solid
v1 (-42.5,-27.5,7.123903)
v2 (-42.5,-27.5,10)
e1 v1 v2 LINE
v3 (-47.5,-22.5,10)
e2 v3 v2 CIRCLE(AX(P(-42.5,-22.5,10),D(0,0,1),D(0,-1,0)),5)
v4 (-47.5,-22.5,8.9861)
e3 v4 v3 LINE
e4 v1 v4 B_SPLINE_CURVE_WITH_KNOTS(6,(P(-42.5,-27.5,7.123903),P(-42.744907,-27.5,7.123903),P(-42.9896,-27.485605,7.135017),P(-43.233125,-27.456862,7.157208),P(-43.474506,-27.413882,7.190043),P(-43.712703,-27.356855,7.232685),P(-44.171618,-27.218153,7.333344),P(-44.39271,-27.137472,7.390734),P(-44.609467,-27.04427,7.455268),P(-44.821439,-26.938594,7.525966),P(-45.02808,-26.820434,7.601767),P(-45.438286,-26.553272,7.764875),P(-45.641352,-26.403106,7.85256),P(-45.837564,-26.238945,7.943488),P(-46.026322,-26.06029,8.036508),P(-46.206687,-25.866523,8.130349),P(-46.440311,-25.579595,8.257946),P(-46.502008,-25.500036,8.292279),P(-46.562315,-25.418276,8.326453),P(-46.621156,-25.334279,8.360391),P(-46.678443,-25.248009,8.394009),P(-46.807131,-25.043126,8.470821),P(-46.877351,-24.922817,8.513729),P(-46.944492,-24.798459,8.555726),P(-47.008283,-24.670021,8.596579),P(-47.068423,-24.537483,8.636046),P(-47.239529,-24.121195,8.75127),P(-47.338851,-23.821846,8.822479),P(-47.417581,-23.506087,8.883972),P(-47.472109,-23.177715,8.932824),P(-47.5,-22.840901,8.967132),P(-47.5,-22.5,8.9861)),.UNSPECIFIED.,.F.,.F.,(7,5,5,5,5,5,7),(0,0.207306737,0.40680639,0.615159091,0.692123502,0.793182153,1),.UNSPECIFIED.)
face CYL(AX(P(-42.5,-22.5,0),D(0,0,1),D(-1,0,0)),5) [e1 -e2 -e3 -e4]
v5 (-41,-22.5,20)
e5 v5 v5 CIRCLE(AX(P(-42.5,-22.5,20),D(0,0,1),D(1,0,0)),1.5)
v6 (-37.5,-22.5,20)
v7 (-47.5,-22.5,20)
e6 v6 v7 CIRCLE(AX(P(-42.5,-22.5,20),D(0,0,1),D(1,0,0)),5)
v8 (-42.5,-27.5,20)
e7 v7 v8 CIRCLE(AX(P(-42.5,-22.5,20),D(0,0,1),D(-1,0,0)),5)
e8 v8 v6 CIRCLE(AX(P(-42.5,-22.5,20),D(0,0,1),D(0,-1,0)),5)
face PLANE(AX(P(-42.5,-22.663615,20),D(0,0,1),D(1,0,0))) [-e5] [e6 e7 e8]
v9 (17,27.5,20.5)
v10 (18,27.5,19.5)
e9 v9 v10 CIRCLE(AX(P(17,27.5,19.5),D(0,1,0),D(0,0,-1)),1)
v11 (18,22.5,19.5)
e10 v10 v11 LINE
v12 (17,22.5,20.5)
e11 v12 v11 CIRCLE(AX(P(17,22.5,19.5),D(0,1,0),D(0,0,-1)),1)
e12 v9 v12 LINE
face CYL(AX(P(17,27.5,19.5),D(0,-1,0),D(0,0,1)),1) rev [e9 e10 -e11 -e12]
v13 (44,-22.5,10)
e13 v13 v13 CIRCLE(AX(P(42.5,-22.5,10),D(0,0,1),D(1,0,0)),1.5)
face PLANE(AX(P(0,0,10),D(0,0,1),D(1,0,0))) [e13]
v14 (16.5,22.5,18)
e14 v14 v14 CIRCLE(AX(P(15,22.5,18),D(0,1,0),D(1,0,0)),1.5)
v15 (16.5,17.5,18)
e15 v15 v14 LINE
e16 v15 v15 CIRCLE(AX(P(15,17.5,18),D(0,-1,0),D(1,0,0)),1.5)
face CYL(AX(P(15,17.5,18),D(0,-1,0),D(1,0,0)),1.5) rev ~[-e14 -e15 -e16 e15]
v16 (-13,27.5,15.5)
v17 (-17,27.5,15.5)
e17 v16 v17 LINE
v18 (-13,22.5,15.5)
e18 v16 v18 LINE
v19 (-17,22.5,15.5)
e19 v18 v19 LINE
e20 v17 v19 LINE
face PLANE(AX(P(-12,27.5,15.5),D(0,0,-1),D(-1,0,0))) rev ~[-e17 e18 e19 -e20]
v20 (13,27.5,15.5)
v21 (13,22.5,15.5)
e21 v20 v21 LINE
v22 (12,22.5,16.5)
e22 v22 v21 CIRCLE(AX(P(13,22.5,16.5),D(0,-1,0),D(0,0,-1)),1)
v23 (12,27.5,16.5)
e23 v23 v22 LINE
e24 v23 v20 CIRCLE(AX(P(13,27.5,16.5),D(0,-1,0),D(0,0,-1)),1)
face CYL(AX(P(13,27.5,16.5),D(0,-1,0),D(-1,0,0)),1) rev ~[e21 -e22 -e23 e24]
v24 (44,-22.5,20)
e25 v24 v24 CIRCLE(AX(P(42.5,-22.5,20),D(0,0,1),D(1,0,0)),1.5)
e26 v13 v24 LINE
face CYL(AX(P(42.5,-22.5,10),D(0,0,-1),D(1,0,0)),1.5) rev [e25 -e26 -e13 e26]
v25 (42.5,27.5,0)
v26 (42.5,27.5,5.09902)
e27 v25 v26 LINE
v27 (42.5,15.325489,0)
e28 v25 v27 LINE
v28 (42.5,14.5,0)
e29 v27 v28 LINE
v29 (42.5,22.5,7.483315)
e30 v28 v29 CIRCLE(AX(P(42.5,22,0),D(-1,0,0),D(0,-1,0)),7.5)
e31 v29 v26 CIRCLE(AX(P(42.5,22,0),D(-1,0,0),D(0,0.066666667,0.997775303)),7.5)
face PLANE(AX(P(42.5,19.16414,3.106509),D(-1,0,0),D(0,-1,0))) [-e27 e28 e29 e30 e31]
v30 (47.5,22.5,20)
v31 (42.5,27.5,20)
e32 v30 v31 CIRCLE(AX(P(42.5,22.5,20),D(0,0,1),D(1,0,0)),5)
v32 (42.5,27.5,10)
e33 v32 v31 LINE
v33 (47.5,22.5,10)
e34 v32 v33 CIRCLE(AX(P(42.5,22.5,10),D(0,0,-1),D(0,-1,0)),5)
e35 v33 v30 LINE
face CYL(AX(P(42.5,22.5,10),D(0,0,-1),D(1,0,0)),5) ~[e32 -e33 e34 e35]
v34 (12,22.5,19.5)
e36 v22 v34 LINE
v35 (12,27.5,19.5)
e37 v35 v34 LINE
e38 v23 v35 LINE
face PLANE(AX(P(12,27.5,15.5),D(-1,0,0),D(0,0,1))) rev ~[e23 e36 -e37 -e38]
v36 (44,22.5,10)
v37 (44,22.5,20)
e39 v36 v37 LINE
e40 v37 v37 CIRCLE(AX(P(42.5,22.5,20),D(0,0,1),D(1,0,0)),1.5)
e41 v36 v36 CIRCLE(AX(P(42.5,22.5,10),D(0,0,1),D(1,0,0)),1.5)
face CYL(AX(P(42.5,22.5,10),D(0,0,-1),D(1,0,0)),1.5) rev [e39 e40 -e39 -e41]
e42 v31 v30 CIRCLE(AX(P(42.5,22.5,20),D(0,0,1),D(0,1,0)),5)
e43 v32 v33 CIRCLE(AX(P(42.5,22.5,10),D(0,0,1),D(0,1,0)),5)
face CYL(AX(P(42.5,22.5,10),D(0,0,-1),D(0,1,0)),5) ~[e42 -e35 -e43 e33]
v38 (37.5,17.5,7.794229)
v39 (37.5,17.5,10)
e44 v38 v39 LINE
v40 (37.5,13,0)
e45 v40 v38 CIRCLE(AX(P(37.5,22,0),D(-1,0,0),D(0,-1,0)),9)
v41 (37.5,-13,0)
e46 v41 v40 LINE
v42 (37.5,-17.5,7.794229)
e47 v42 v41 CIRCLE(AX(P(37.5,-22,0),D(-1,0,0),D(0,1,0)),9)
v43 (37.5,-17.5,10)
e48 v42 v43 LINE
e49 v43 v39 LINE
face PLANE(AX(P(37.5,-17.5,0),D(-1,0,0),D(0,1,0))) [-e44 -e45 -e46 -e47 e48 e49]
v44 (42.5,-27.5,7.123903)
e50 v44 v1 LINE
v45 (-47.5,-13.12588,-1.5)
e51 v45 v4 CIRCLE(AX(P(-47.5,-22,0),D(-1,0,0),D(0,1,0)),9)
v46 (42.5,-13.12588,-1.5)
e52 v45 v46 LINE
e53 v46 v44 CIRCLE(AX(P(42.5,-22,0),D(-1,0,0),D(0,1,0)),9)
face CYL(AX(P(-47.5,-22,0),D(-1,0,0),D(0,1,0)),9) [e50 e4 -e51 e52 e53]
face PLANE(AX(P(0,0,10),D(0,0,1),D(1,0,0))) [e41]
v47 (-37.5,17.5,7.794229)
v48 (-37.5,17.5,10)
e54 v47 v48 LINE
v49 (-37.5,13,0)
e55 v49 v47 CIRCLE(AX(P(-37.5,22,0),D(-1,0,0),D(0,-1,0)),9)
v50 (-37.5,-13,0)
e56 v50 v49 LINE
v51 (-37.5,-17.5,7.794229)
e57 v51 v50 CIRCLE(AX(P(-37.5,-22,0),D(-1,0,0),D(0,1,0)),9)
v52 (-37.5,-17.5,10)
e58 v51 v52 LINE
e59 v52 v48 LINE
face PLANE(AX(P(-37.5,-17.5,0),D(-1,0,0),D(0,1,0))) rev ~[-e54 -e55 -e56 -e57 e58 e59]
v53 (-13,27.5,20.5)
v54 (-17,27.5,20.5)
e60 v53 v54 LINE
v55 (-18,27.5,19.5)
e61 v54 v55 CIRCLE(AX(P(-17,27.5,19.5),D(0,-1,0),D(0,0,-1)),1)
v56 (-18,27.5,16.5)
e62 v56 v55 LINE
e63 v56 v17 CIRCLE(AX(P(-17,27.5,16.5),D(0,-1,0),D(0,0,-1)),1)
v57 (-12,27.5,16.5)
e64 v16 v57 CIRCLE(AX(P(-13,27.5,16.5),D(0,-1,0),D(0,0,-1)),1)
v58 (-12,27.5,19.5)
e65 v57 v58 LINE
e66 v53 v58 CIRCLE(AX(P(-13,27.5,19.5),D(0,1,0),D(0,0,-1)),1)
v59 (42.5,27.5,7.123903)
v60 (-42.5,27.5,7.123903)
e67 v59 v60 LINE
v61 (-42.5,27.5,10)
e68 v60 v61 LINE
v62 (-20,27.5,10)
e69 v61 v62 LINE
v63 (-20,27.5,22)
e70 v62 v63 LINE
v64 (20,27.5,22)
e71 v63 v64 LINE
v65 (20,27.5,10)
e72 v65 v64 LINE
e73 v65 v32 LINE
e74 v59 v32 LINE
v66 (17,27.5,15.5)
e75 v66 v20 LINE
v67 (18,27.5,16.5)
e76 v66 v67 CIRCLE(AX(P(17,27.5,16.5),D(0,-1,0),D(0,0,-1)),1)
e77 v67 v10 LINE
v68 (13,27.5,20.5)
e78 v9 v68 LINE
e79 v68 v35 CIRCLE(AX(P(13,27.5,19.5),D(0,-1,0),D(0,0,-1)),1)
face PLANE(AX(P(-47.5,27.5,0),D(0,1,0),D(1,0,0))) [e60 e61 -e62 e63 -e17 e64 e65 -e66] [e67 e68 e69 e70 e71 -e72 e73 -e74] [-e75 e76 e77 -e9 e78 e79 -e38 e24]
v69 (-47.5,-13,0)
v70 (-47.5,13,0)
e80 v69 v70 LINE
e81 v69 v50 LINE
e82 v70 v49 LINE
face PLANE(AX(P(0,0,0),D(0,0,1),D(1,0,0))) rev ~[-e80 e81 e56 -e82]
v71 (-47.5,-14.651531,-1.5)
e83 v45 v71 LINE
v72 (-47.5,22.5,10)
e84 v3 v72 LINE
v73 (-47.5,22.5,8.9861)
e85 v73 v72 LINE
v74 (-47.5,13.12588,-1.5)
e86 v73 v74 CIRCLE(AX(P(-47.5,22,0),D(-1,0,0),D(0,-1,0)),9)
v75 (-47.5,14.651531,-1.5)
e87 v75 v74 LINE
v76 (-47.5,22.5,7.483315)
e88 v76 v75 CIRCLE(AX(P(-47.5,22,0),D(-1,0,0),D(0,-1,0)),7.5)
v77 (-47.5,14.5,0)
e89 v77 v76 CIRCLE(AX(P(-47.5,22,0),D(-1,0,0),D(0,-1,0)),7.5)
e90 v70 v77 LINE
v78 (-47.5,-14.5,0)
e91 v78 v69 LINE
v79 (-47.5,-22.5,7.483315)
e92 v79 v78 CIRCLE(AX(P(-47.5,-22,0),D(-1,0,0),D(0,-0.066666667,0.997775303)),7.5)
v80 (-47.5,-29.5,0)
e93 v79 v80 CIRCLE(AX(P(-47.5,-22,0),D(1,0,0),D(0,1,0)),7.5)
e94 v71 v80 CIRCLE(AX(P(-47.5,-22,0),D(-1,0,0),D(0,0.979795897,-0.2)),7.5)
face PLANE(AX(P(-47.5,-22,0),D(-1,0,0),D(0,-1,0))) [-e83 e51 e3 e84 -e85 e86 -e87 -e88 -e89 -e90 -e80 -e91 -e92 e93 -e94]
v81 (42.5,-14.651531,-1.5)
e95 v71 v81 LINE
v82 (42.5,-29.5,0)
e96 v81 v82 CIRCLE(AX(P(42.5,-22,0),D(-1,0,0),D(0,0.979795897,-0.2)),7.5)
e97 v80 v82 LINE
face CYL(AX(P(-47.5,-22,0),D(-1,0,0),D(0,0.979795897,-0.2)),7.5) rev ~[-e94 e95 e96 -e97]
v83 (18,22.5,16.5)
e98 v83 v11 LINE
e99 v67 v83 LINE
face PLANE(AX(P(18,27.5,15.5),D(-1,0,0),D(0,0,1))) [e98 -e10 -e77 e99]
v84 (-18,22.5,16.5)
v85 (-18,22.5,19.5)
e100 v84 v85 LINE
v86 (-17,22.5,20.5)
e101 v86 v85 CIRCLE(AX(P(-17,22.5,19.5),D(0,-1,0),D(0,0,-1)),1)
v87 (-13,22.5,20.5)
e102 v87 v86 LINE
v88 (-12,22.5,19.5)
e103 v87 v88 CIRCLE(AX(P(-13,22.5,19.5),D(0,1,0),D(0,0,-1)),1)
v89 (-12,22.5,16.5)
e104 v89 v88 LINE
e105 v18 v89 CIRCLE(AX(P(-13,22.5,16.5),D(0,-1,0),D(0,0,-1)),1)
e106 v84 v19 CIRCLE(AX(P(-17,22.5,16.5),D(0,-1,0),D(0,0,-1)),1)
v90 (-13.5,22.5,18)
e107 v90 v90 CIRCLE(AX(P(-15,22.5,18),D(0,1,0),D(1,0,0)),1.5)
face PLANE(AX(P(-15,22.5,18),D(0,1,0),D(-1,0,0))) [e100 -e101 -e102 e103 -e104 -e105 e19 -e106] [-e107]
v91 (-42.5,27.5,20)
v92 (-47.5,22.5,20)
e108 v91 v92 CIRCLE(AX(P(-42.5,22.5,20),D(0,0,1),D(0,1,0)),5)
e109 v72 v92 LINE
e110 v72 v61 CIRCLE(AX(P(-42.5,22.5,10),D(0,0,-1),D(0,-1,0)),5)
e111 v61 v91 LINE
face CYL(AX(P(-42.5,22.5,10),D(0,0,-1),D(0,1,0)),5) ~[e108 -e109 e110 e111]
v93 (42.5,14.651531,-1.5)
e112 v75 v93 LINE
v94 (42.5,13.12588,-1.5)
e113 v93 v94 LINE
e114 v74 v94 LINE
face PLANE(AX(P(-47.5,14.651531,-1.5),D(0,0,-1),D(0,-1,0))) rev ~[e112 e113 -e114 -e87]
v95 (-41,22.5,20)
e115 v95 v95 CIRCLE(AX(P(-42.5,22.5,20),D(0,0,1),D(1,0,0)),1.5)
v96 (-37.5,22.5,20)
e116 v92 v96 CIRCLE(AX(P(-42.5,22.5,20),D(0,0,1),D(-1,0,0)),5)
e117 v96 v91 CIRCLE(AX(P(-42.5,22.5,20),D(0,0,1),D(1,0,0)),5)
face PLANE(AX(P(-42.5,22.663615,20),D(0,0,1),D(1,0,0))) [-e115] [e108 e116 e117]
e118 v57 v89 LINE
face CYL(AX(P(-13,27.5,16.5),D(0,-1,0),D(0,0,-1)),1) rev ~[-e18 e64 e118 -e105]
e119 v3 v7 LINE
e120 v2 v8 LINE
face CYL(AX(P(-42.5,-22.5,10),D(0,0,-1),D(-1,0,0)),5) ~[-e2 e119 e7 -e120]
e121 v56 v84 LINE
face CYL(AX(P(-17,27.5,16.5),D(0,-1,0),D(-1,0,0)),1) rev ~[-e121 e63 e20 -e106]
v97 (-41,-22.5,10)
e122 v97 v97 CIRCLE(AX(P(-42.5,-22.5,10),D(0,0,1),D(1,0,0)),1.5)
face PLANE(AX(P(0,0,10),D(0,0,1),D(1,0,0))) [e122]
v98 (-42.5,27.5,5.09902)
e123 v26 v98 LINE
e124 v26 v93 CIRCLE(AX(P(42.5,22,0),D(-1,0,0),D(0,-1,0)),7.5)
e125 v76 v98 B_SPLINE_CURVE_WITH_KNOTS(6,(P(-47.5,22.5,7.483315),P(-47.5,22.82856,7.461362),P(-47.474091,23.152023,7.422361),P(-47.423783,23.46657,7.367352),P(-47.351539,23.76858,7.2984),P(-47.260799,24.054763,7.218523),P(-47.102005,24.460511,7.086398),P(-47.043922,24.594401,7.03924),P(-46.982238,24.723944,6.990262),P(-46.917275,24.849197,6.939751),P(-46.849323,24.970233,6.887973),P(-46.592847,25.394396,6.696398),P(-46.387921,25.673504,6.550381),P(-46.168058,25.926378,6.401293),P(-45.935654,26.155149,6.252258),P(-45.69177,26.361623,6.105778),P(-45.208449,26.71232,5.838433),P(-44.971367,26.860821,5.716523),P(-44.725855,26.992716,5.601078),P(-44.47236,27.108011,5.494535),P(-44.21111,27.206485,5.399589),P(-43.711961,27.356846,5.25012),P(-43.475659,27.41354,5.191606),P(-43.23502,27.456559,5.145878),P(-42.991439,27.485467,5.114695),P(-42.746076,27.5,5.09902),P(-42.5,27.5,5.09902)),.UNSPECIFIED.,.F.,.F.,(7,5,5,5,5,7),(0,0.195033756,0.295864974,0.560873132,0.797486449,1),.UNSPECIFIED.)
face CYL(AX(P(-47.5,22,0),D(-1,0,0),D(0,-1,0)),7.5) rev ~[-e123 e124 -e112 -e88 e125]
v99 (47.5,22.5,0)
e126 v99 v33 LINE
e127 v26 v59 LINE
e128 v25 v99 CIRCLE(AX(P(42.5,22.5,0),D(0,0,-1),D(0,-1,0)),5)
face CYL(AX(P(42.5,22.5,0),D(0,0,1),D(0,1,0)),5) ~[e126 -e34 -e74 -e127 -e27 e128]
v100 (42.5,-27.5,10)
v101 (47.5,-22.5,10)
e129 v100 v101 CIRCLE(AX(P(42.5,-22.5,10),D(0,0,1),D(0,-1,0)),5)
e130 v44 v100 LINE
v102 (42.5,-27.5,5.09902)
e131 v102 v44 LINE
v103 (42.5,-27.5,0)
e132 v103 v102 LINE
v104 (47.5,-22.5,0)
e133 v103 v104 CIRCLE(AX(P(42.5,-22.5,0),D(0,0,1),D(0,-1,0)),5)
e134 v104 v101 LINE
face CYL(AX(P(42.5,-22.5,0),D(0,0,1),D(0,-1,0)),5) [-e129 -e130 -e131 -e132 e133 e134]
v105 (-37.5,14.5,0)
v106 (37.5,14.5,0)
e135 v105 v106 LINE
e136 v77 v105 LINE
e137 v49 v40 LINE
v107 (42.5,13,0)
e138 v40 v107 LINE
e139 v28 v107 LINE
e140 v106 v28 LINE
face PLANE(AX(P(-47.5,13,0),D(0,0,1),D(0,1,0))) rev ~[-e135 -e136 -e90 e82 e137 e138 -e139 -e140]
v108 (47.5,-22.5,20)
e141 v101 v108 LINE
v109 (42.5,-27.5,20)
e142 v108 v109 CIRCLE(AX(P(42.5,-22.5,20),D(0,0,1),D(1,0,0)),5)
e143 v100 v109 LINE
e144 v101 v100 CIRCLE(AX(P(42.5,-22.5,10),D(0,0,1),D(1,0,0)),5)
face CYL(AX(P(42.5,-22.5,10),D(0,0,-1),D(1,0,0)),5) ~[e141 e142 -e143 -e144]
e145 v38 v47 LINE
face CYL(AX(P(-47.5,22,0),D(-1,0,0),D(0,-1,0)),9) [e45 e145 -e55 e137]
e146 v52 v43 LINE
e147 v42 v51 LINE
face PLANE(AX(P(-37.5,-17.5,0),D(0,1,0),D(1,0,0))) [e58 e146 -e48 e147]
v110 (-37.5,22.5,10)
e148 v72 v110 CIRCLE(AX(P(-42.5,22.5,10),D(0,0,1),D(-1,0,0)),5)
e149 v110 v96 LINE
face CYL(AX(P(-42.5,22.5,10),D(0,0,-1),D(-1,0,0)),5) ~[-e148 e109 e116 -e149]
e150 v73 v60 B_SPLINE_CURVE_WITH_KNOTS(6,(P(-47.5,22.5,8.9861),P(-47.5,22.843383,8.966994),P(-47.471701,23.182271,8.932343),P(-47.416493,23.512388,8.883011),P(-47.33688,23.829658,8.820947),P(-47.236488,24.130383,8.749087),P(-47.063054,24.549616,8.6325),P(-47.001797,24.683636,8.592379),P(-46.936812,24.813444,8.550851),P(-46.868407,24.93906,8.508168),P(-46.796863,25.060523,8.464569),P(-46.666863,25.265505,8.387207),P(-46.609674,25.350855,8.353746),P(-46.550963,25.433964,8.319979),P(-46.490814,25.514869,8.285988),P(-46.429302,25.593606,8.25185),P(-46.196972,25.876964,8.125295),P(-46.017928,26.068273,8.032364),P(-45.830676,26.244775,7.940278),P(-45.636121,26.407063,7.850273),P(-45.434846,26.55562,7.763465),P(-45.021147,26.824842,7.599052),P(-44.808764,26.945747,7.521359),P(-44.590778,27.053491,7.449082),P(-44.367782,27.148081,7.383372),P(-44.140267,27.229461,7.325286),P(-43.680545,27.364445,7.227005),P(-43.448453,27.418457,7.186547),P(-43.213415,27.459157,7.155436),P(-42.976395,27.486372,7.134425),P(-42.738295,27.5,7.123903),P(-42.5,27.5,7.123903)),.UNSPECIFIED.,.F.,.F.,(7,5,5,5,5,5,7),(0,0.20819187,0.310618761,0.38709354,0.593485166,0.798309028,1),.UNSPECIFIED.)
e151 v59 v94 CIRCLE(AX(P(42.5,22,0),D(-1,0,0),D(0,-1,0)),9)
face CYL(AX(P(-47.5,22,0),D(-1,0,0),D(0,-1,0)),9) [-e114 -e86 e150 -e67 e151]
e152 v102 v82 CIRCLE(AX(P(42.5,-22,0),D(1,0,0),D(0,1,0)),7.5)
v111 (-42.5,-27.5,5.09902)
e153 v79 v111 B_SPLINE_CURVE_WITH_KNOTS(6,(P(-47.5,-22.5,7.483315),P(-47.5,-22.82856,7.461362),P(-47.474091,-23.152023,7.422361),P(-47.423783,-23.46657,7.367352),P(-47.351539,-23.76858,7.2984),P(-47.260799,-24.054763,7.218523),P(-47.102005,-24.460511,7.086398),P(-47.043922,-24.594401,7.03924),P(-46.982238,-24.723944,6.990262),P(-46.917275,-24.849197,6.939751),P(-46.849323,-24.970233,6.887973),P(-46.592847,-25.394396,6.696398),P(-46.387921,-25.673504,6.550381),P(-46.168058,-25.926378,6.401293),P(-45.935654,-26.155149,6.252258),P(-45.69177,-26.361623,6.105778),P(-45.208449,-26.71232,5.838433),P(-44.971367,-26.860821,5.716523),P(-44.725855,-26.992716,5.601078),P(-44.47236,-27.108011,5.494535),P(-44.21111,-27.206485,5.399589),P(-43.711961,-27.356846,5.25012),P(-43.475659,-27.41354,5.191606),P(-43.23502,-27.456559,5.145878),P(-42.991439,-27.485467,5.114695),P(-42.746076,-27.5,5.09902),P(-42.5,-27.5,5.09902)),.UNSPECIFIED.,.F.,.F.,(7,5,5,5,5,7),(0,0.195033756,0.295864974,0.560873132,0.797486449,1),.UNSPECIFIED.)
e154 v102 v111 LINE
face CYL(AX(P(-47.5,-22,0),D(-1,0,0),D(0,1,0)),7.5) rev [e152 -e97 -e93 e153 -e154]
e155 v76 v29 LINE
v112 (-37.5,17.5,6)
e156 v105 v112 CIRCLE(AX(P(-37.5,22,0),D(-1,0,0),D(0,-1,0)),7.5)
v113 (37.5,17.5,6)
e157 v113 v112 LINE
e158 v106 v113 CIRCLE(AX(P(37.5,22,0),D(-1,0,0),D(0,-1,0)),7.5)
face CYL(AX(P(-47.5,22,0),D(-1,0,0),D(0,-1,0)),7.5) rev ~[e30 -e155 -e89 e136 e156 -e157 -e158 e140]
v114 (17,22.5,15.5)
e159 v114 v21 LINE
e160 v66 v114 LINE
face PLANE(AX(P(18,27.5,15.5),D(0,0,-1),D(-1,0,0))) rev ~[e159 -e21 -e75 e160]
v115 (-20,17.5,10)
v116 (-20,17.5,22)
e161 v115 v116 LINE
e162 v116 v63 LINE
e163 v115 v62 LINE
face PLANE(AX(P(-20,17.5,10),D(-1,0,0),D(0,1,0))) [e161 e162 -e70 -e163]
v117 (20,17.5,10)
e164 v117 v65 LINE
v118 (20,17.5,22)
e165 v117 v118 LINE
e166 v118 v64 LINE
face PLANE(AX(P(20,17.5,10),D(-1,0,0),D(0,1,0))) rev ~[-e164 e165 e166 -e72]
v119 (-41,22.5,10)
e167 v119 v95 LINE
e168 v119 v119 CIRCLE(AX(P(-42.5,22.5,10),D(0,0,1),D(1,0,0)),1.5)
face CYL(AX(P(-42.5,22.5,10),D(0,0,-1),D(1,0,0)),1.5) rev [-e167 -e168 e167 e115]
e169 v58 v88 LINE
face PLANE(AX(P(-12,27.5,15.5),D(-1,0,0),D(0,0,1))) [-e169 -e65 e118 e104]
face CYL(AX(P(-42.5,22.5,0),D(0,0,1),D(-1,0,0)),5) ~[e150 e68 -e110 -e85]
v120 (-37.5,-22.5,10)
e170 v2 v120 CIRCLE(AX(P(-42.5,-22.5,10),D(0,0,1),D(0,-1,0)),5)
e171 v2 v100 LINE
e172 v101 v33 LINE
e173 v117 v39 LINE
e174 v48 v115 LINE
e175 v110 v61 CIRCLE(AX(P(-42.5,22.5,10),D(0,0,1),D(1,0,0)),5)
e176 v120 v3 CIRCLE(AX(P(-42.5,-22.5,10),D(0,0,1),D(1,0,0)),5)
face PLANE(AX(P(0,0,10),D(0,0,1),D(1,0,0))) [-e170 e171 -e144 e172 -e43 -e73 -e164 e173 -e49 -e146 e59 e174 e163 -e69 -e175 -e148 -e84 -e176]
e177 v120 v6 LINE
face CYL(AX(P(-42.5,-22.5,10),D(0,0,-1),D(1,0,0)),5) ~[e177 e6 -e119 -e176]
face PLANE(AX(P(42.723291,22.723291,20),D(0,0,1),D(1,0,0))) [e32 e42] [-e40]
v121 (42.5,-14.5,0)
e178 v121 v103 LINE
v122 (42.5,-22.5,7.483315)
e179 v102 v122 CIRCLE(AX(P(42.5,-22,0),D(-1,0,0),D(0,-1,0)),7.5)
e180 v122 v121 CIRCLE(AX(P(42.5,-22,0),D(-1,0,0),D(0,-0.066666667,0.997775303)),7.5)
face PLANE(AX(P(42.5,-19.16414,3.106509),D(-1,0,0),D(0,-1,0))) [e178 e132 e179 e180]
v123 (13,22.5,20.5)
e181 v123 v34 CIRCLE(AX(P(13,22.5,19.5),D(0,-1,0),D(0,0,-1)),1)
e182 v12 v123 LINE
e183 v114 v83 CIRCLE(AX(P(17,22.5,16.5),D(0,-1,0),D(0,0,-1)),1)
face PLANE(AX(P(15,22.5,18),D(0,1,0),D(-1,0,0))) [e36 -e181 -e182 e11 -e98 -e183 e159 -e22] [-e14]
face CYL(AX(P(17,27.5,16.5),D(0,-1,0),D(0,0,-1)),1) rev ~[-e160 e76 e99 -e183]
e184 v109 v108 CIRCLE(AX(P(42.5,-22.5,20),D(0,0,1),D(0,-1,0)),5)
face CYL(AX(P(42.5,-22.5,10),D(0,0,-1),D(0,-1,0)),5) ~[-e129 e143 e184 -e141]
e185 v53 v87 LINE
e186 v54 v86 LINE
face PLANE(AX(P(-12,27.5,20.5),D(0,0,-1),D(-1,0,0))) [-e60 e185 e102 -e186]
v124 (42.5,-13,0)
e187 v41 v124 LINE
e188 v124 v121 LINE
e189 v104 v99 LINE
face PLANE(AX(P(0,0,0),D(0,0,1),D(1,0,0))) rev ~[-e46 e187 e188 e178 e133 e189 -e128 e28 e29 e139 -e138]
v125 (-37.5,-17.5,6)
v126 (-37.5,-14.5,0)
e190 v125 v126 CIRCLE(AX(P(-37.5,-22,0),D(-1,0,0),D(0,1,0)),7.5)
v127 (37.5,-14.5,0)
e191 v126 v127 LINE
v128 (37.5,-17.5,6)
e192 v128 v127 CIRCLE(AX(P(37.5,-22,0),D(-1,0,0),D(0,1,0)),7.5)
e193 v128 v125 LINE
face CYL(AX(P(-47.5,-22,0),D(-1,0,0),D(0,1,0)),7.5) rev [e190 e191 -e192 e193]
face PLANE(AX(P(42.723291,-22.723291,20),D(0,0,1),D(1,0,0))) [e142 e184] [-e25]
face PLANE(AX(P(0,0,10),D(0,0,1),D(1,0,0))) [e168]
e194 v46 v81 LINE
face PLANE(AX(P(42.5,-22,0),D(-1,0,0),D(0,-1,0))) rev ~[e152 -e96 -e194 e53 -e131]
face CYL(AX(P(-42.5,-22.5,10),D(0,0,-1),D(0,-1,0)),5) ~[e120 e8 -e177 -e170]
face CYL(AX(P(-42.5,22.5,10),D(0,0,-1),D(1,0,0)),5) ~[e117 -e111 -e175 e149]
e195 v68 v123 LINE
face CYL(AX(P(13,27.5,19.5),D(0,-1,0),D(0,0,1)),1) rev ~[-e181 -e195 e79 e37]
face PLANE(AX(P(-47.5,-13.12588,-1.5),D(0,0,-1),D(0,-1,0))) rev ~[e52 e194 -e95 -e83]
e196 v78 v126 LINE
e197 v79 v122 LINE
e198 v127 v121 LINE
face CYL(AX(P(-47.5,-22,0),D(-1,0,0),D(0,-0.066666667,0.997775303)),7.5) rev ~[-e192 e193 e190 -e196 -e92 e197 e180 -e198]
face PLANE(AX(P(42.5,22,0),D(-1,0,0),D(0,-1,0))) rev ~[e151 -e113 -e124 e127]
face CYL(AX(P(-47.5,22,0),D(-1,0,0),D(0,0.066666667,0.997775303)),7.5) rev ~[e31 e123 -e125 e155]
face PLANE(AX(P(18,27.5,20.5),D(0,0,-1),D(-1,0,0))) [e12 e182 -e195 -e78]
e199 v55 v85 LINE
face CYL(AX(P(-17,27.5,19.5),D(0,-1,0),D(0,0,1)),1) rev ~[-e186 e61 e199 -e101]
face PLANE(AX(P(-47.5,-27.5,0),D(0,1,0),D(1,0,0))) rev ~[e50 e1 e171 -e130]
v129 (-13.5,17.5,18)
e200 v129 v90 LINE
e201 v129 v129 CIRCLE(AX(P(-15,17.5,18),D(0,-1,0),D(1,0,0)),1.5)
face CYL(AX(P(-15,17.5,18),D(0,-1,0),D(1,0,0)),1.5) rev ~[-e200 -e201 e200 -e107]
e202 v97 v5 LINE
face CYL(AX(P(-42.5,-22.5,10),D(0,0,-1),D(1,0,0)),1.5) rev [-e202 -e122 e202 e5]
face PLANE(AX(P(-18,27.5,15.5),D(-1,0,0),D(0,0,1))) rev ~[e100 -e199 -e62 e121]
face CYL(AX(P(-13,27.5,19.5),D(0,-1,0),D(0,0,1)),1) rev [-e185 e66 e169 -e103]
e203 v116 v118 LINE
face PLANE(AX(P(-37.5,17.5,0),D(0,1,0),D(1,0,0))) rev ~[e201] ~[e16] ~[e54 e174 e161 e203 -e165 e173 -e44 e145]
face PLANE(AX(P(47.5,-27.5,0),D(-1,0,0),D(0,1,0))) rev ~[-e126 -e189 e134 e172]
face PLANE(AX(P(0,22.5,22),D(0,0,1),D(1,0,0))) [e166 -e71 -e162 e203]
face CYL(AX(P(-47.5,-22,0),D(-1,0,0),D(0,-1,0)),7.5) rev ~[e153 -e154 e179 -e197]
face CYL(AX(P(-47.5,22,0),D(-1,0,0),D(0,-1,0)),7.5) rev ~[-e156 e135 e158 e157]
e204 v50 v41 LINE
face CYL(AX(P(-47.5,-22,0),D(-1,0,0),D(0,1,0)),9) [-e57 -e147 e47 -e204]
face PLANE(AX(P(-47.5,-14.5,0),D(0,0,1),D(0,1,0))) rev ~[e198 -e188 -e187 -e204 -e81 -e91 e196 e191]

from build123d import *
from build123d import SkipClean  # not in build123d's __all__

# Parameters (mm, degrees)
F0_W      = 95
F0_H      = 55
F0_W_2    = 75
F0_H_2    = 35
F1_DEPTH  = 10
F2_R      = 5
F3_W      = 40
F3_H      = 10
F4_DEPTH  = 12
F5_R      = 1.5
F6_DEPTH  = 25
F7_W      = 6
F7_H      = 5
F7_R      = 1.5
F8_DEPTH  = 5
F9_R      = 1
F10_R     = 9
F10_R_2   = 7.5
F11_DEPTH = 90
F13_DEPTH = 90
F14_R     = 1.5
F15_DEPTH = 10


with BuildPart() as f1:
    # F0 (on Top) → F1 (new body)
    with BuildSketch(Plane.XY):
        Rectangle(F0_W, F0_H)
        Rectangle(F0_W_2, F0_H_2, mode=Mode.SUBTRACT)
    extrude(amount=F1_DEPTH)

    # F2
    f2_edges = [f1.edges().sort_by_distance(p)[0] for p in [
        (-47.5, -27.5, 5),
        (47.5, -27.5, 5),
        (47.5, 27.5, 5),
        (-47.5, 27.5, 5),
    ]]
    fillet(f2_edges, radius=F2_R)

    # F3 (on face) → F4 (join)
    with BuildSketch(Plane.XY.offset(10)):
        with Locations((0, 22.5)):
            Rectangle(F3_W, F3_H)
    extrude(amount=F4_DEPTH)

    # F5 (on face) → F6 (cut)
    with BuildSketch(Plane.XZ.offset(-17.5)):
        with Locations((-15, 18)):
            Circle(F5_R)
        with Locations((15, 18)):
            Circle(F5_R)
    extrude(amount=-F6_DEPTH, mode=Mode.SUBTRACT)

    # F7 (on face) → F8 (cut)
    with BuildSketch(Plane(origin=(0, 27.5, 0), x_dir=(-1, 0, 0), z_dir=(0, 1, 0))):
        with Locations((15, 18)):
            Rectangle(F7_W, F7_H)
        with Locations((15, 18)):
            Circle(F7_R, mode=Mode.SUBTRACT)
        with Locations((-15, 18)):
            Rectangle(F7_W, F7_H)
        with Locations((-15, 18)):
            Circle(F7_R, mode=Mode.SUBTRACT)
    extrude(amount=-F8_DEPTH, mode=Mode.SUBTRACT)

    # F9
    f9_edges = [f1.edges().sort_by_distance(p)[0] for p in [
        (18, 25, 20.5),
        (12, 25, 20.5),
        (18, 25, 15.5),
        (12, 25, 15.5),
        (-18, 25, 20.5),
        (-12, 25, 20.5),
        (-12, 25, 15.5),
        (-18, 25, 15.5),
    ]]
    fillet(f9_edges, radius=F9_R)

    # F10 (on face) → F11 (join)
    with BuildSketch(Plane(origin=(-47.5, 0, 0), x_dir=(0, -1, 0), z_dir=(-1, 0, 0))):
        with BuildLine():
            ThreePointArc((31, 0), (22, 9), (13, 0))
            ThreePointArc((13, 0), (22, -9), (31, 0))
        make_face()
        with BuildLine():
            ThreePointArc((29.5, 0), (22, -7.5), (14.5, 0))
            ThreePointArc((14.5, 0), (22, 7.5), (29.5, 0))
        make_face(mode=Mode.SUBTRACT)
        with Locations((-22, 0)):
            Circle(F10_R)
        with Locations((-22, 0)):
            Circle(F10_R_2, mode=Mode.SUBTRACT)
    extrude(amount=-F11_DEPTH)

    # F12 (on face) → F13 (cut)
    with BuildSketch(Plane(origin=(-47.5, 0, 0), x_dir=(0, -1, 0), z_dir=(-1, 0, 0))):
        with BuildLine():
            Line((-15.325489454, 0), (-14.5, 0))
            ThreePointArc((-14.5, 0), (-16.876524617, 5.4772255751), (-22.5, 7.4833147735))
            Line((-22.5, 7.4833147735), (-22.5, 0))
            Line((-22.5, 0), (-15.325489454, 0))
        make_face()
        with BuildLine():
            Line((-14.5, -1.5), (-14.5, 0))
            ThreePointArc((-14.5, 0), (-14.5379788525, -0.753817215), (-14.6515307717, -1.5))
            Line((-14.6515307717, -1.5), (-14.5, -1.5))
        make_face()
        with BuildLine():
            ThreePointArc((22.5, 7.4833147735), (16.876524617, 5.4772255751), (14.5, 0))
            Line((14.5, 0), (15.7362241298, 0))
            Line((15.7362241298, 0), (22.5, 0))
            Line((22.5, 0), (22.5, 7.4833147735))
        make_face()
        with BuildLine():
            ThreePointArc((14.6515307717, -1.5), (14.5379788525, -0.753817215), (14.5, 0))
            Line((14.5, 0), (14.5, -1.5))
            Line((14.5, -1.5), (14.6515307717, -1.5))
        make_face()
        with BuildLine():
            Line((15.7362241298, 0), (14.5, 0))
            ThreePointArc((14.5, 0), (14.5379788525, -0.753817215), (14.6515307717, -1.5))
            Line((14.6515307717, -1.5), (15.7362241298, -1.5))
            Line((15.7362241298, -1.5), (15.7362241298, 0))
        make_face()
        with BuildLine():
            Line((14.5, 0), (13, 0))
            ThreePointArc((13, 0), (13.0315252949, -0.7526363425), (13.1258803254, -1.5))
            Line((13.1258803254, -1.5), (14.5, -1.5))
            Line((14.5, -1.5), (14.5, 0))
        make_face()
        with BuildLine():
            Line((-13, 0), (-14.5, 0))
            Line((-14.5, 0), (-14.5, -1.5))
            Line((-14.5, -1.5), (-13.1258803254, -1.5))
            ThreePointArc((-13.1258803254, -1.5), (-13.0315252949, -0.7526363425), (-13, 0))
        make_face()
        with BuildLine():
            Line((-22.5, 0), (-22.5, 7.4833147735))
            ThreePointArc((-22.5, 7.4833147735), (-27.6480411448, -4.9345345502), (-14.6515307717, -1.5))
            Line((-14.6515307717, -1.5), (-15.325489454, -1.5))
            Line((-15.325489454, -1.5), (-15.325489454, 0))
            Line((-15.325489454, 0), (-22.5, 0))
        make_face()
        with BuildLine():
            ThreePointArc((29.5, 0), (27.4772255751, 5.123475383), (22.5, 7.4833147735))
            Line((22.5, 7.4833147735), (22.5, 0))
            Line((22.5, 0), (15.7362241298, 0))
            Line((15.7362241298, 0), (15.7362241298, -1.5))
            Line((15.7362241298, -1.5), (14.6515307717, -1.5))
            ThreePointArc((14.6515307717, -1.5), (22.753817215, -7.4620211475), (29.5, 0))
        make_face()
    extrude(amount=-F13_DEPTH, mode=Mode.SUBTRACT)

    # F14 (on face) → F15 (join)
    with BuildSketch(Plane.XY.offset(10)):
        with BuildLine():
            ThreePointArc((-42.5, 27.5), (-46.0355339059, 26.0355339059), (-47.5, 22.5))
            ThreePointArc((-47.5, 22.5), (-42.5, 17.5), (-37.5, 22.5))
            ThreePointArc((-37.5, 22.5), (-38.9644660941, 26.0355339059), (-42.5, 27.5))
        make_face()
        with Locations((-42.5, 22.5)):
            Circle(F14_R, mode=Mode.SUBTRACT)
        with BuildLine():
            ThreePointArc((-42.5, -27.5), (-38.9644660941, -26.0355339059), (-37.5, -22.5))
            ThreePointArc((-37.5, -22.5), (-42.5, -17.5), (-47.5, -22.5))
            ThreePointArc((-47.5, -22.5), (-46.0355339059, -26.0355339059), (-42.5, -27.5))
        make_face()
        with Locations((-42.5, -22.5)):
            Circle(F14_R, mode=Mode.SUBTRACT)
        with BuildLine():
            ThreePointArc((47.5, -22.5), (38.9644660941, -18.9644660941), (42.5, -27.5))
            ThreePointArc((42.5, -27.5), (46.0355339059, -26.0355339059), (47.5, -22.5))
        make_face()
        with Locations((42.5, -22.5)):
            Circle(F14_R, mode=Mode.SUBTRACT)
        with BuildLine():
            ThreePointArc((42.5, 27.5), (38.9644660941, 18.9644660941), (47.5, 22.5))
            ThreePointArc((47.5, 22.5), (46.0355339059, 26.0355339059), (42.5, 27.5))
        make_face()
        with Locations((42.5, 22.5)):
            Circle(F14_R, mode=Mode.SUBTRACT)
    with SkipClean():  # cleaning this boolean's faces spoils the solid; the shape is the same uncleaned
        extrude(amount=F15_DEPTH)


solid = f1.part
